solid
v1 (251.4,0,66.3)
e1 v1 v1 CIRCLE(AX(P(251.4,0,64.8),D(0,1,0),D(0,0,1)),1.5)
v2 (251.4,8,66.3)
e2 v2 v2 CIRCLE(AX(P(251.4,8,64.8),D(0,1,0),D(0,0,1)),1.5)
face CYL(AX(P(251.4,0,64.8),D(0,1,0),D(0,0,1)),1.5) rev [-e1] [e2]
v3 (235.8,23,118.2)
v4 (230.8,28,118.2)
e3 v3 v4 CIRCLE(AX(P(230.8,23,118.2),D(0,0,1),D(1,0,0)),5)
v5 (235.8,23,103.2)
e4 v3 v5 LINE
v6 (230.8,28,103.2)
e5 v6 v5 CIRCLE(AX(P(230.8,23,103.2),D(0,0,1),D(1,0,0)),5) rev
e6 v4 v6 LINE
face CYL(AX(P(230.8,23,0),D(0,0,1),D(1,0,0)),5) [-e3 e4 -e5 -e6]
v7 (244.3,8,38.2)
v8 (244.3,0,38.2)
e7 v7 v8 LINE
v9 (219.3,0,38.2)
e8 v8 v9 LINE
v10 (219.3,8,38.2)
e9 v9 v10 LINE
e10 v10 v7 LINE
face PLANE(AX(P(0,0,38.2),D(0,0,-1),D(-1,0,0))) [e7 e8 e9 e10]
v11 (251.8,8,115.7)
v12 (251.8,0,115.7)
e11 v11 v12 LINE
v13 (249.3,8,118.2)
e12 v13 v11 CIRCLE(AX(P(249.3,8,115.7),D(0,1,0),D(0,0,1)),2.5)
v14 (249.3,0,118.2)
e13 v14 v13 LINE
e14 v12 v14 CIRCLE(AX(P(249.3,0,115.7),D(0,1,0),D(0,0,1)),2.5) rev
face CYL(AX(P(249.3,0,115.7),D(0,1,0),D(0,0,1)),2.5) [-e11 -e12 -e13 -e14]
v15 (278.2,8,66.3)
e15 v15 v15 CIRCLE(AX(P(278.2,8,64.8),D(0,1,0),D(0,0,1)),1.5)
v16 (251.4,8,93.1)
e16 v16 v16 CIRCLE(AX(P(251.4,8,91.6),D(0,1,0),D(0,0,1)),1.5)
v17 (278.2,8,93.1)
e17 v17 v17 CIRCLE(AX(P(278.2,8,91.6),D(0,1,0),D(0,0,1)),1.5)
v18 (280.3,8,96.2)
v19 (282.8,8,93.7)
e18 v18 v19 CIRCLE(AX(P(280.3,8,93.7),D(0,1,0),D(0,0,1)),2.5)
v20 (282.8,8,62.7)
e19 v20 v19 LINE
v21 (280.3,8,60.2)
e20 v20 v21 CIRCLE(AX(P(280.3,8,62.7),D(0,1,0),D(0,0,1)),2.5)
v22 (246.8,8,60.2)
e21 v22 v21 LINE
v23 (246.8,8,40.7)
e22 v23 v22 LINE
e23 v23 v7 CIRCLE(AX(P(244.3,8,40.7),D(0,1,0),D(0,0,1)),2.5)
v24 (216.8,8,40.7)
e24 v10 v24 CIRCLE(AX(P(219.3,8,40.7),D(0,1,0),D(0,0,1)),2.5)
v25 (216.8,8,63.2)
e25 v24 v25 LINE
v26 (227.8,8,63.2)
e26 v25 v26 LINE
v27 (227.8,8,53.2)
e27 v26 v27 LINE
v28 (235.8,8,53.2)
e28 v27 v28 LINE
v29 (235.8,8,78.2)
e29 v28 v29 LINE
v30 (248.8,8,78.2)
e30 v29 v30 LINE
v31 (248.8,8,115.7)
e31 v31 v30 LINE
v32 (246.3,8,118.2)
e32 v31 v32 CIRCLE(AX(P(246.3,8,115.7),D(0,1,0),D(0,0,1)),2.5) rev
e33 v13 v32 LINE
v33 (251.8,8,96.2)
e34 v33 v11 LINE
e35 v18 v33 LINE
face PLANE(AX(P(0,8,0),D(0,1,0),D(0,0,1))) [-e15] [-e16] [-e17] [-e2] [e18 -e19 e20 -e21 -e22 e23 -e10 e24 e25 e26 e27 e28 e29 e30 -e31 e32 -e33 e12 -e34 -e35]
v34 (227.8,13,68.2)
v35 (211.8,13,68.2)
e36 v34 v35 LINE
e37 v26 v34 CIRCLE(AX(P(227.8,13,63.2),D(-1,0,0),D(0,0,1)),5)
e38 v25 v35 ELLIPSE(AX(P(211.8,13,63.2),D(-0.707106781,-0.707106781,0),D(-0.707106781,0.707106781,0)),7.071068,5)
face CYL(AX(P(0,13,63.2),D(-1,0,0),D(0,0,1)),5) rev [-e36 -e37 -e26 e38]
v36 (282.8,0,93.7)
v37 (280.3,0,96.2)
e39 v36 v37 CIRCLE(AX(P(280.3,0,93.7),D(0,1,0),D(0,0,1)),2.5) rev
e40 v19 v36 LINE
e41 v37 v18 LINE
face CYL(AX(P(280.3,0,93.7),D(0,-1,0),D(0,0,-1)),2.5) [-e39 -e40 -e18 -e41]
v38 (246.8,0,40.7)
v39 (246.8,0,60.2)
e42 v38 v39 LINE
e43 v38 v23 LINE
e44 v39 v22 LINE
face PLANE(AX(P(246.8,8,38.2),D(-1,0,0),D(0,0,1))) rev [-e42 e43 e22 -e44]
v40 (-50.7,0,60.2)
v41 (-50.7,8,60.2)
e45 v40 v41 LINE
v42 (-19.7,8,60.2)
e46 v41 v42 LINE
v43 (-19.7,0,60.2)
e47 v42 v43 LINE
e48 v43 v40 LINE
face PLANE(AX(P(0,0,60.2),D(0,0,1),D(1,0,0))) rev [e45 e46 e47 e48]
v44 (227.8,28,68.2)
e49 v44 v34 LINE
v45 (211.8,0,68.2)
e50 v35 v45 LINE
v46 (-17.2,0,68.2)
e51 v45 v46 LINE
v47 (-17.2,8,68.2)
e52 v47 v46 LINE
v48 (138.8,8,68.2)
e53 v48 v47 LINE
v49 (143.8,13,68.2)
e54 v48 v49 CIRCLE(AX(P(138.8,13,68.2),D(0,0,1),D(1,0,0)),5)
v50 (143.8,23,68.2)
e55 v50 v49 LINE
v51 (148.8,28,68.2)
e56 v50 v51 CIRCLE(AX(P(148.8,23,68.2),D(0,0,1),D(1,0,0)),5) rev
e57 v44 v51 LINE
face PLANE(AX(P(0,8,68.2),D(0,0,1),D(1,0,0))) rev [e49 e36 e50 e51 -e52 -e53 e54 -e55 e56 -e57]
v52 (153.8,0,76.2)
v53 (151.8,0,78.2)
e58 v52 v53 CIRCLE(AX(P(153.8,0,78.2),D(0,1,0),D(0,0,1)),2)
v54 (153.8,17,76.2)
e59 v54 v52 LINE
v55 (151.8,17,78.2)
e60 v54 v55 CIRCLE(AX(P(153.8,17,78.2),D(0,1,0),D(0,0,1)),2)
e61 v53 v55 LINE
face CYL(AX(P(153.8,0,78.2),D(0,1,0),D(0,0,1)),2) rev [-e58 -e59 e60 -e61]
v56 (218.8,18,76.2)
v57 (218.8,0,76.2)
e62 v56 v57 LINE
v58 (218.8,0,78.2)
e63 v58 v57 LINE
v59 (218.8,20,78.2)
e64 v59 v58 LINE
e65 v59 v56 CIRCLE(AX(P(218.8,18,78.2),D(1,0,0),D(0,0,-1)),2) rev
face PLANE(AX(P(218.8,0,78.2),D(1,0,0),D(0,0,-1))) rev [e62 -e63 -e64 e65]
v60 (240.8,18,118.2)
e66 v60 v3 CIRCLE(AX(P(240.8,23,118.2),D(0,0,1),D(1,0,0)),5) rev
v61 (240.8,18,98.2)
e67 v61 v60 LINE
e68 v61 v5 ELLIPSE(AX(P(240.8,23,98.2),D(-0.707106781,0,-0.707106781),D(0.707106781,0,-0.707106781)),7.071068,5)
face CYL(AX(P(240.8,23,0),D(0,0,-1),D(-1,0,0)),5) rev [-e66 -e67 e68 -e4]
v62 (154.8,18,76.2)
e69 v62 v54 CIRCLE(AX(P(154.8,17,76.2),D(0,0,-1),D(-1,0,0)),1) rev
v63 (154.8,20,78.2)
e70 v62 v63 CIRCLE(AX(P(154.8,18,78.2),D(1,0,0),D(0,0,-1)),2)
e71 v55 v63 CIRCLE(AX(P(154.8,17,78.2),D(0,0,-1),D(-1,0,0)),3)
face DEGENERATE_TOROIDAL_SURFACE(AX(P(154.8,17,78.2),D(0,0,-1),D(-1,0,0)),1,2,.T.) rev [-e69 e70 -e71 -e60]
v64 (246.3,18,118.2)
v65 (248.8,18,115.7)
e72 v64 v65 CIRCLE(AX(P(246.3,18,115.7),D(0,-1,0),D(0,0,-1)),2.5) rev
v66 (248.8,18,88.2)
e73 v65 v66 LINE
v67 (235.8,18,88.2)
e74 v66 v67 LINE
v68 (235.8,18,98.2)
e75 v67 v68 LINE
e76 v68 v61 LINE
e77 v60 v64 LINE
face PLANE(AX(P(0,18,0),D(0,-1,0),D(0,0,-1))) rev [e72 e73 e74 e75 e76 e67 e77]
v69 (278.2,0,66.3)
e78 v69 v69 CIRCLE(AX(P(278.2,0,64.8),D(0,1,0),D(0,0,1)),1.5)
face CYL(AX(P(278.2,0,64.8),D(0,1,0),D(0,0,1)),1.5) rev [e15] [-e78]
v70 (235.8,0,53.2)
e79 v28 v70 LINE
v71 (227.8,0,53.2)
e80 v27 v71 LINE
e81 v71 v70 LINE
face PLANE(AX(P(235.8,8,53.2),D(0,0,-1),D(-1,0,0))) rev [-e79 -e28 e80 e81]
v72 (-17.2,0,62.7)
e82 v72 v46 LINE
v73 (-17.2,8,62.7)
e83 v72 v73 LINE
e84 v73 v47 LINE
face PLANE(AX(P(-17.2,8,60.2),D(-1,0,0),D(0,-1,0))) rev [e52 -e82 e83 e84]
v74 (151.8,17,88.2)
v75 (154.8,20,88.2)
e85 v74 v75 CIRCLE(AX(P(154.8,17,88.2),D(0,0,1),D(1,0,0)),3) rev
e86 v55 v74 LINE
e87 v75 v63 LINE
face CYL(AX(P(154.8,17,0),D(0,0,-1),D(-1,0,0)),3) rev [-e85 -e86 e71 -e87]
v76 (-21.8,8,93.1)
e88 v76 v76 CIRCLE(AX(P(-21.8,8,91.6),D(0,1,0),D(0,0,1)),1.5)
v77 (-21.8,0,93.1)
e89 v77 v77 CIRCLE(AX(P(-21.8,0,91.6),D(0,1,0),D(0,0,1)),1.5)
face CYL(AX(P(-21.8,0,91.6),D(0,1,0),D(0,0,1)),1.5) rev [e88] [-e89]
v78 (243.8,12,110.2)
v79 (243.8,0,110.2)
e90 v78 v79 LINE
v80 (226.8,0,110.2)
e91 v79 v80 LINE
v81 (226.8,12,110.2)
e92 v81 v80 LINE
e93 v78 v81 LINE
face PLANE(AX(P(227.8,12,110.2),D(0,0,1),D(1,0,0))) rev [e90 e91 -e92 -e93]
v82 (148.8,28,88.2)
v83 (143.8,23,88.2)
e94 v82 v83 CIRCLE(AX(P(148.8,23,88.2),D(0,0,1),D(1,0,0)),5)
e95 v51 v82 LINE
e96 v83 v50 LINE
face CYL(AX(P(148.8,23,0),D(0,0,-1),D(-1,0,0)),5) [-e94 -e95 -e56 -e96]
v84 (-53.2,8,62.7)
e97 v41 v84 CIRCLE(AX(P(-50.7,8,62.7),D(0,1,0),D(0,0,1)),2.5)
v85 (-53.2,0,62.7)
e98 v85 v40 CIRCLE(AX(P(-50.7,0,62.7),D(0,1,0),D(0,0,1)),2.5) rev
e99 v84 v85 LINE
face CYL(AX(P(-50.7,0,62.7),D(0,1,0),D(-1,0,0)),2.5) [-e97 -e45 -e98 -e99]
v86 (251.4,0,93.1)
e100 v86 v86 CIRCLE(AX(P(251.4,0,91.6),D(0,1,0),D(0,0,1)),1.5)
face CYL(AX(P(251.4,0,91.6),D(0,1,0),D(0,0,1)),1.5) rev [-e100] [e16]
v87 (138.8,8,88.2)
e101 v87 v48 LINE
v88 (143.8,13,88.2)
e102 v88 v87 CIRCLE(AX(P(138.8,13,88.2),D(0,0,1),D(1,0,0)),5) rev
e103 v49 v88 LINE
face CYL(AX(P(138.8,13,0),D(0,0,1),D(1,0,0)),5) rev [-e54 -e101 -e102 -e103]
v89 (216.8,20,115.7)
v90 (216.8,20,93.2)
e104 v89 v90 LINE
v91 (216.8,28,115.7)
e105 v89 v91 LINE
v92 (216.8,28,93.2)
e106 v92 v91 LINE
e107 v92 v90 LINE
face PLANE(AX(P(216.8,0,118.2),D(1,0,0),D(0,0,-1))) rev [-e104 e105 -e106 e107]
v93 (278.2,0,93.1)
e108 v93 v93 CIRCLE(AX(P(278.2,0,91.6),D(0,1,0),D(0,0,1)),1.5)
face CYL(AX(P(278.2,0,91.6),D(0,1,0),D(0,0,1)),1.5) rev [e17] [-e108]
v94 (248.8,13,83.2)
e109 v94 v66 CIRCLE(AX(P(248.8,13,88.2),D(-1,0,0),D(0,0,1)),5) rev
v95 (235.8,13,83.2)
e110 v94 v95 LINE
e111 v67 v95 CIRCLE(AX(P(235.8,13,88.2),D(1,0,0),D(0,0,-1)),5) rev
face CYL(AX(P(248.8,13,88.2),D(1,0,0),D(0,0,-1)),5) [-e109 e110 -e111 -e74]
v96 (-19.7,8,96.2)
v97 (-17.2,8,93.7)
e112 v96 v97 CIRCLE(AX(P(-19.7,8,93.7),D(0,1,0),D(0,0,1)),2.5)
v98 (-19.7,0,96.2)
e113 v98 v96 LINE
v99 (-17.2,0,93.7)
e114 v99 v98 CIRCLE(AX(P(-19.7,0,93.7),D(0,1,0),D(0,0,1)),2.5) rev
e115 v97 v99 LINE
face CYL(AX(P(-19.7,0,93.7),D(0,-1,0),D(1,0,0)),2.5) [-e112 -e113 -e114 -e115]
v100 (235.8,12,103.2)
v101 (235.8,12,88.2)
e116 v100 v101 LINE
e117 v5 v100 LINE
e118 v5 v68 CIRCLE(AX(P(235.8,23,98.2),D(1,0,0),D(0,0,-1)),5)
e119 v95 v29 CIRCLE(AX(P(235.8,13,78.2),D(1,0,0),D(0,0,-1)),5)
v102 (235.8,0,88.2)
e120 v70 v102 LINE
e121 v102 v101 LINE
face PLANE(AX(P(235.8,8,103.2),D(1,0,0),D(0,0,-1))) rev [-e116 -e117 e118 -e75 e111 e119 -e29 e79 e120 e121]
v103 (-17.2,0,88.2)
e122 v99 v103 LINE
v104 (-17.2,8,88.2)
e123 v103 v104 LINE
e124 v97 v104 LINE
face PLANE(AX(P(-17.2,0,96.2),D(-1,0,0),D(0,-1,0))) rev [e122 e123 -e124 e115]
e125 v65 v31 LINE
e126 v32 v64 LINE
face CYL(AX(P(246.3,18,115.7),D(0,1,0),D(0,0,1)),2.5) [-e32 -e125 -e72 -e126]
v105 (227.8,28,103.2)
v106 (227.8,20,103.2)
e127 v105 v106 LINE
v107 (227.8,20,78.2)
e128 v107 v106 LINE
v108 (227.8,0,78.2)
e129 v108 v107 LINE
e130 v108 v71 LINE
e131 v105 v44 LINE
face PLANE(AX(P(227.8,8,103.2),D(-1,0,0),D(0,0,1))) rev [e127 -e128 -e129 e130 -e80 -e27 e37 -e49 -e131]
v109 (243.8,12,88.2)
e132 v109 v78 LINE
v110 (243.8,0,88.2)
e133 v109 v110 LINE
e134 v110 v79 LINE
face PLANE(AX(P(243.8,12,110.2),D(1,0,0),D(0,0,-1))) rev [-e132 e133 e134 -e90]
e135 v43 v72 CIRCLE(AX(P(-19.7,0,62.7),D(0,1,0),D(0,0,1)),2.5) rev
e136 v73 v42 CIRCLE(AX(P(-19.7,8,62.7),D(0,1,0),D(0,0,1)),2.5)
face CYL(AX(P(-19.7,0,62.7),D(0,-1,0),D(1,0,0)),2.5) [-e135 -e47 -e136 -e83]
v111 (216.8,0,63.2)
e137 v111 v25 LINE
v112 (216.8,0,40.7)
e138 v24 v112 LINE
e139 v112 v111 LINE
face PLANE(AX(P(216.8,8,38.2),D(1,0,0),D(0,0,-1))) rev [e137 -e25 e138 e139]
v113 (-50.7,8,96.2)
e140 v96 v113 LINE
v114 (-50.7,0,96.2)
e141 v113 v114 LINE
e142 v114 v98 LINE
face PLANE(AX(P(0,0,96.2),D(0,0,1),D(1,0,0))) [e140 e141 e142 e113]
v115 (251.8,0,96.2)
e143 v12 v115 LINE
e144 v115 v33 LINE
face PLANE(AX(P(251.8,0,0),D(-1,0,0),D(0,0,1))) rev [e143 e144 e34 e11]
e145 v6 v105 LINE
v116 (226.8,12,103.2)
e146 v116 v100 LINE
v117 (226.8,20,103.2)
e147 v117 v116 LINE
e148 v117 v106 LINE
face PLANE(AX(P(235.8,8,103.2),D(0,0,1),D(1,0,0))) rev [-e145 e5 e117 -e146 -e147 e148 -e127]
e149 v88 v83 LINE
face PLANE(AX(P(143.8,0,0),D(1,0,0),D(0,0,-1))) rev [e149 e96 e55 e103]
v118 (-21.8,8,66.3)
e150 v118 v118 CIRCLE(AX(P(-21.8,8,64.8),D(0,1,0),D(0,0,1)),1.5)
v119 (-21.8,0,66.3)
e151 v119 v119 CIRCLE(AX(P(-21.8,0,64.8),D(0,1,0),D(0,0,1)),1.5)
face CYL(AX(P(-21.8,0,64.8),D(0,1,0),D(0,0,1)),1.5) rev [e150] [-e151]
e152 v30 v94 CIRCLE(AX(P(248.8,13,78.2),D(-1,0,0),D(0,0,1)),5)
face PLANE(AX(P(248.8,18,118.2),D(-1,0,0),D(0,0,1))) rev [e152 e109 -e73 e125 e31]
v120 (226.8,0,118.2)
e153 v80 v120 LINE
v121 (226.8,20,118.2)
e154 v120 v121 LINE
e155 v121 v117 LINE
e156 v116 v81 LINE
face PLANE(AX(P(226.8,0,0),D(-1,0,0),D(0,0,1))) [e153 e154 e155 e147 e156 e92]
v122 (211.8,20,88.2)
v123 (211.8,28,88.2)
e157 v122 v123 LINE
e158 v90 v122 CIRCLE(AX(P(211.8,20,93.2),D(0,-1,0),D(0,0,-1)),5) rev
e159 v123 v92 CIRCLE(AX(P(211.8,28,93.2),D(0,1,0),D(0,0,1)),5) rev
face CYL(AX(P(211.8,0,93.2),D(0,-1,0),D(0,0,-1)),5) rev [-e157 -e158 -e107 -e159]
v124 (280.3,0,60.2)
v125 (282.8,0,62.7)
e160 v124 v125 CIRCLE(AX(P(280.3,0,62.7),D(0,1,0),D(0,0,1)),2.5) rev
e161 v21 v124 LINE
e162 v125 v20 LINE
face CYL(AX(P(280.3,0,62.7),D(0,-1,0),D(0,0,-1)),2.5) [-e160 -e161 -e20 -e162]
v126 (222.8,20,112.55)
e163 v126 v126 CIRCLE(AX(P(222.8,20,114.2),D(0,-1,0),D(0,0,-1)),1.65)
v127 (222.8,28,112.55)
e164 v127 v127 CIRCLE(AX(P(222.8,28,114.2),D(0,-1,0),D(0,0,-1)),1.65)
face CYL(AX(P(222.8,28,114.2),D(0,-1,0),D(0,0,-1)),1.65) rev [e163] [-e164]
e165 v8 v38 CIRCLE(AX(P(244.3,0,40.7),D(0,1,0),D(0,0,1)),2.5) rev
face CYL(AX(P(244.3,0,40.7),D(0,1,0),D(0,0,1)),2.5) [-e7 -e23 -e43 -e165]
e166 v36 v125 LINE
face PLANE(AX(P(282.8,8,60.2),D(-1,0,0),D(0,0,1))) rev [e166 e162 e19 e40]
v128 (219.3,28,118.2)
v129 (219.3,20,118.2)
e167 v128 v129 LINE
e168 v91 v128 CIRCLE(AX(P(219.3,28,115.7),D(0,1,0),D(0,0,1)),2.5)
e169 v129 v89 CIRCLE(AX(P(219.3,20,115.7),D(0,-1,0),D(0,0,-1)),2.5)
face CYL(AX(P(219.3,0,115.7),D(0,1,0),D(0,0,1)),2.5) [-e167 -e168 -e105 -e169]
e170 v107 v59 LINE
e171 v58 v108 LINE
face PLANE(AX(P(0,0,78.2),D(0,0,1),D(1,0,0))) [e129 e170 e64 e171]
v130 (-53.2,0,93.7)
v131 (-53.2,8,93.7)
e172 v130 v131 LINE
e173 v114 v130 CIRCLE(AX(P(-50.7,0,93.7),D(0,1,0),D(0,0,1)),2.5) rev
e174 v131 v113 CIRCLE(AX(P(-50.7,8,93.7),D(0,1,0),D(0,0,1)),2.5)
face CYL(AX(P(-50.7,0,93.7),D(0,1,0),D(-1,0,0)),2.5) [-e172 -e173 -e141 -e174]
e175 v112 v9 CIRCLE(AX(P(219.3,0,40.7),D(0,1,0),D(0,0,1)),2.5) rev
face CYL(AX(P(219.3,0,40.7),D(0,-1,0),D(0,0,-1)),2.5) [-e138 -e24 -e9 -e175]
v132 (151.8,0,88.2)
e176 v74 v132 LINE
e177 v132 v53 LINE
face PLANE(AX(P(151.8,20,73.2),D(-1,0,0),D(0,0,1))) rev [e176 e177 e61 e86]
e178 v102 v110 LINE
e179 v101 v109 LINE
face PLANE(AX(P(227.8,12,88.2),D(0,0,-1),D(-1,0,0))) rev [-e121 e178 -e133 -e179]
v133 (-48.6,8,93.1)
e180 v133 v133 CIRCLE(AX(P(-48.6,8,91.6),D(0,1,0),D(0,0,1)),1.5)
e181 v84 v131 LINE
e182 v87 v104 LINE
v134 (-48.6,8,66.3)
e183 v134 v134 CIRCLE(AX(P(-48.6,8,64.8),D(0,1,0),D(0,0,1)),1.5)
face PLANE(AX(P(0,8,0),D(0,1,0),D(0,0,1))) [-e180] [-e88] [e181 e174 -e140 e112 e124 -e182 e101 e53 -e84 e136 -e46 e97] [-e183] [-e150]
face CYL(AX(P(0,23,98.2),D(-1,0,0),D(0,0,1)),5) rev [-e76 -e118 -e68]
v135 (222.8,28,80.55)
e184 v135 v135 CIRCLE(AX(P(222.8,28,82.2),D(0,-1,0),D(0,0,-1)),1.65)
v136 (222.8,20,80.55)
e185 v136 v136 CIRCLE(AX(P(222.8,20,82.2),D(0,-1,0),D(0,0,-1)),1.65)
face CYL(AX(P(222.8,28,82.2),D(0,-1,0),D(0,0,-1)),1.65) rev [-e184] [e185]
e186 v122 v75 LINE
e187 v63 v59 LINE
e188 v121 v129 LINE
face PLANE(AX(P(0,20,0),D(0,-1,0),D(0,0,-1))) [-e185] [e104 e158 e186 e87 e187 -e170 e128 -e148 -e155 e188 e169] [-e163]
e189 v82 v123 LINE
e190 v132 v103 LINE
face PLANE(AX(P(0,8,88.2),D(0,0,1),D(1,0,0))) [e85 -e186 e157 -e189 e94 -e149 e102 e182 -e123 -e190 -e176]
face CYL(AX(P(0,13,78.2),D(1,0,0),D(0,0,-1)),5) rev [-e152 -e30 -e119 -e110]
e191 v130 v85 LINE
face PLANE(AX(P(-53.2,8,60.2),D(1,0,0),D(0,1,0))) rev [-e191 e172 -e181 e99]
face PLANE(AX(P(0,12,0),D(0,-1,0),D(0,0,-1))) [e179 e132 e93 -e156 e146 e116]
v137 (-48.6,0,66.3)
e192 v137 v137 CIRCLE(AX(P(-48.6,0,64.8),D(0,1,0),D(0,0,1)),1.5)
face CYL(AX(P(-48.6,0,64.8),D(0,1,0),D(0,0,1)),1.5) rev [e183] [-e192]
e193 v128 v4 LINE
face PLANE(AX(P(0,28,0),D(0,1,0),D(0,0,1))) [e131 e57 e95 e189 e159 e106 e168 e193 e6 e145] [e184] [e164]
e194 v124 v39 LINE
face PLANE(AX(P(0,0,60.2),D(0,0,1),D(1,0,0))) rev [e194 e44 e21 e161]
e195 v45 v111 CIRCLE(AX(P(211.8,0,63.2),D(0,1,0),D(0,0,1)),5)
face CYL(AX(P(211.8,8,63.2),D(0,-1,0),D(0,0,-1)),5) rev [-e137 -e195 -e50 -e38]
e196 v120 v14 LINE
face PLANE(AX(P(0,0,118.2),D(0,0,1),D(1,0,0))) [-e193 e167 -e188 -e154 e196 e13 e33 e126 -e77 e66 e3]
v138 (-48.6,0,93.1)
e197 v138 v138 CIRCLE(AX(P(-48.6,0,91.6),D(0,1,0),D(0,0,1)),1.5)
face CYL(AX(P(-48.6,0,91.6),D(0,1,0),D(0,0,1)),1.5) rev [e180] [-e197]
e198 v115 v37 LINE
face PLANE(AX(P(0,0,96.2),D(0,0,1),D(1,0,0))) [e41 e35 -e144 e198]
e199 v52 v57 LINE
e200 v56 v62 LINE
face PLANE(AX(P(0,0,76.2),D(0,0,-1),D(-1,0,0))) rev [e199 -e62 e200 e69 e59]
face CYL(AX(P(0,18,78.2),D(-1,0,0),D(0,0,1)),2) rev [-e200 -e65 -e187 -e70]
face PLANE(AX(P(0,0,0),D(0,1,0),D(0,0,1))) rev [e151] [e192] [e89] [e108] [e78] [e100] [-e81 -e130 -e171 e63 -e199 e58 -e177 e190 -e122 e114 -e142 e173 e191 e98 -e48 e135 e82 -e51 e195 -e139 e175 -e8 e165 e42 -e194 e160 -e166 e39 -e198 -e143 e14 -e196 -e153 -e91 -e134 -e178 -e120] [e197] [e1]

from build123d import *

# Parameters (mm, degrees)
SKETCH1_W            = 70
SKETCH1_H            = 20
SKETCH1_W_2          = 264.8
EXTRUDE_1017_DEPTH   = 8
SKETCH2_W            = 36
SKETCH2_H            = 8
BOSS_EXTRUDE2_DEPTH  = 8
SKETCH4_W            = 36
SKETCH4_H            = 8
BOSS_EXTRUDE3_DEPTH  = 8
SKETCH5_R            = 1.5
CUT_EXTRUDE1_DEPTH   = 349.438631613
FILLET1_R            = 2.5
SKETCH6_W            = 52
SKETCH6_H            = 20
CUT_EXTRUDE2_DEPTH   = 349.438631613
SKETCH7_W            = 16.8
SKETCH7_H            = 20
CUT_EXTRUDE3_DEPTH   = 299.821485171
SKETCH8_W            = 30
SKETCH8_H            = 8
BOSS_EXTRUDE4_DEPTH  = 30
SKETCH9_W            = 30
SKETCH9_H            = 8
BOSS_EXTRUDE5_DEPTH  = 30
SKETCH10_W           = 8
SKETCH10_H           = 50
CUT_EXTRUDE4_DEPTH   = 307.61226329
SKETCH12_W           = 11
SKETCH12_H           = 50
BOSS_EXTRUDE6_DEPTH  = 17
SKETCH13_W           = 8
SKETCH13_H           = 15
BOSS_EXTRUDE7_DEPTH  = 17
SKETCH15_W           = 11
SKETCH15_H           = 45
CUT_EXTRUDE6_DEPTH   = 20
SKETCH16_W           = 22
SKETCH16_H           = 8
BOSS_EXTRUDE9_DEPTH  = 5
SKETCH18_W           = 13
SKETCH18_H           = 40
BOSS_EXTRUDE10_DEPTH = 10
SKETCH21_W           = 13
SKETCH21_H           = 5
CUT_EXTRUDE9_DEPTH   = 10
SKETCH17_W           = 16
SKETCH17_H           = 22
CUT_EXTRUDE7_DEPTH   = 12
SKETCH19_W           = 70
SKETCH19_H           = 20
BOSS_EXTRUDE11_DEPTH = 17
SKETCH20_W           = 65
SKETCH20_H           = 15
CUT_EXTRUDE8_DEPTH   = 20
SKETCH22_W           = 20
SKETCH22_H           = 17
BOSS_EXTRUDE12_DEPTH = 3
BOSS_EXTRUDE13_DEPTH = 3
SKETCH24_R           = 1.65
CUT_EXTRUDE10_DEPTH  = 308.159697877
BOSS_EXTRUDE14_DEPTH = 1
FILLET4_R            = 5
FILLET5_R            = 5
FILLET7_R            = 5
FILLET8_R            = 5
FILLET9_R            = 5
FILLET10_R           = 5
FILLET11_R           = 5
FILLET12_R           = 5
FILLET13_R           = 5
FILLET14_R           = 2.5
FILLET15_R           = 2.5
FILLET16_R           = 2.5
FILLET17_R           = 5
SKETCH26_W           = 76
SKETCH26_H           = 20
BOSS_EXTRUDE15_DEPTH = 3
FILLET18_R           = 3
SKETCH27_W           = 9
SKETCH27_H           = 20
BOSS_EXTRUDE16_DEPTH = 2
FILLET20_R           = 2


with BuildPart() as part:
    # Sketch1 → Extrude 1017 (new body)
    with BuildSketch(Plane(origin=(0, 0, 0), x_dir=(1, 0, 0), z_dir=(0, 1, 0))):
        with Locations((-35, -78.2)):
            Rectangle(SKETCH1_W, SKETCH1_H)
        with Locations((132.4, -78.2)):
            Rectangle(SKETCH1_W_2, SKETCH1_H)
        with Locations((299.8, -78.2)):
            Rectangle(SKETCH1_W, SKETCH1_H)
    extrude(amount=EXTRUDE_1017_DEPTH)

    # Sketch2 → Boss-Extrude2 (add)
    with BuildSketch(Plane(origin=(0, 0, 68.2), x_dir=(-1, 0, 0), z_dir=(0, 0, -1))):
        with Locations((35.2, 4)):
            Rectangle(SKETCH2_W, SKETCH2_H)
        with Locations((-264.8, 4)):
            Rectangle(SKETCH2_W, SKETCH2_H)
    extrude(amount=BOSS_EXTRUDE2_DEPTH)

    # Sketch4 → Boss-Extrude3 (add)
    with BuildSketch(Plane.XY.offset(88.2)):
        with Locations((-35.2, 4)):
            Rectangle(SKETCH4_W, SKETCH4_H)
        with Locations((264.8, 4)):
            Rectangle(SKETCH4_W, SKETCH4_H)
    extrude(amount=BOSS_EXTRUDE3_DEPTH)

    # Sketch5 → Cut-Extrude1 (cut, through all)
    with BuildSketch(Plane(origin=(0, 8, 0), x_dir=(1, 0, 0), z_dir=(0, 1, 0))):
        with Locations(Location((-48.6, -91.6, 0), (0, 0, 270))):
            Circle(SKETCH5_R)
        with Locations(Location((-21.8, -91.6, 0), (0, 0, 270))):
            Circle(SKETCH5_R)
        with Locations(Location((-21.8, -64.8, 0), (0, 0, 270))):
            Circle(SKETCH5_R)
        with Locations(Location((-48.6, -64.8, 0), (0, 0, 270))):
            Circle(SKETCH5_R)
        with Locations(Location((278.2, -91.6, 0), (0, 0, 270))):
            Circle(SKETCH5_R)
        with Locations(Location((251.4, -64.8, 0), (0, 0, 270))):
            Circle(SKETCH5_R)
        with Locations(Location((278.2, -64.8, 0), (0, 0, 270))):
            Circle(SKETCH5_R)
        with Locations(Location((251.4, -91.6, 0), (0, 0, 270))):
            Circle(SKETCH5_R)
    extrude(amount=-CUT_EXTRUDE1_DEPTH, mode=Mode.SUBTRACT)

    # Fillet1
    fillet1_edges = [part.edges().sort_by_distance(p)[0] for p in [
        (-53.2, 4, 60.2),
        (-17.2, 4, 60.2),
        (282.8, 4, 60.2),
        (-17.2, 4, 96.2),
        (-53.2, 4, 96.2),
        (282.8, 4, 96.2),
    ]]
    fillet(fillet1_edges, radius=FILLET1_R)

    # Sketch6 → Cut-Extrude2 (cut, through all)
    with BuildSketch(Plane(origin=(0, 8, 0), x_dir=(1, 0, 0), z_dir=(0, 1, 0))):
        with Locations((308.8, -78.2)):
            Rectangle(SKETCH6_W, SKETCH6_H)
    extrude(amount=-CUT_EXTRUDE2_DEPTH, mode=Mode.SUBTRACT)

    # Sketch7 → Cut-Extrude3 (cut, through all)
    with BuildSketch(Plane(origin=(0, 0, 0), x_dir=(-1, 0, 0), z_dir=(0, -1, 0))):
        with Locations((61.6, -78.2)):
            Rectangle(SKETCH7_W, SKETCH7_H)
    extrude(amount=-CUT_EXTRUDE3_DEPTH, mode=Mode.SUBTRACT)

    # Sketch8 → Boss-Extrude4 (add)
    with BuildSketch(Plane.XY.offset(88.2)):
        with Locations((231.8, 4)):
            Rectangle(SKETCH8_W, SKETCH8_H)
    extrude(amount=BOSS_EXTRUDE4_DEPTH)

    # Sketch9 → Boss-Extrude5 (add)
    with BuildSketch(Plane(origin=(0, 0, 68.2), x_dir=(-1, 0, 0), z_dir=(0, 0, -1))):
        with Locations((-231.8, 4)):
            Rectangle(SKETCH9_W, SKETCH9_H)
    extrude(amount=BOSS_EXTRUDE5_DEPTH)

    # Sketch10 → Cut-Extrude4 (cut, through all)
    with BuildSketch(Plane(origin=(0, 0, 0), x_dir=(-1, 0, 0), z_dir=(0, -1, 0))):
        with Locations((-231.8, -78.2)):
            Rectangle(SKETCH10_W, SKETCH10_H)
    extrude(amount=-CUT_EXTRUDE4_DEPTH, mode=Mode.SUBTRACT)

    # Sketch12 → Boss-Extrude6 (add)
    with BuildSketch(Plane(origin=(0, 8, 0), x_dir=(1, 0, 0), z_dir=(0, 1, 0))):
        with Locations((222.3, -93.2)):
            Rectangle(SKETCH12_W, SKETCH12_H)
    extrude(amount=BOSS_EXTRUDE6_DEPTH)

    # Sketch13 → Boss-Extrude7 (add)
    with BuildSketch(Plane(origin=(0, 8, 0), x_dir=(1, 0, 0), z_dir=(0, 1, 0))):
        with Locations((231.8, -110.7)):
            Rectangle(SKETCH13_W, SKETCH13_H)
    extrude(amount=BOSS_EXTRUDE7_DEPTH)

    # Sketch15 → Cut-Extrude6 (cut)
    with BuildSketch(Plane(origin=(0, 0, 0), x_dir=(-1, 0, 0), z_dir=(0, -1, 0))):
        with Locations((-222.3, -95.7)):
            Rectangle(SKETCH15_W, SKETCH15_H)
    extrude(amount=-CUT_EXTRUDE6_DEPTH, mode=Mode.SUBTRACT)

    # Sketch16 → Boss-Extrude9 (add)
    with BuildSketch(Plane(origin=(246.8, 0, 0), x_dir=(0, 0, -1), z_dir=(1, 0, 0))):
        with Locations((-107.2, 4)):
            Rectangle(SKETCH16_W, SKETCH16_H)
    extrude(amount=BOSS_EXTRUDE9_DEPTH)

    # Sketch18 → Boss-Extrude10 (add)
    with BuildSketch(Plane(origin=(0, 8, 0), x_dir=(1, 0, 0), z_dir=(0, 1, 0))):
        with Locations((242.3, -98.2)):
            Rectangle(SKETCH18_W, SKETCH18_H)
    extrude(amount=BOSS_EXTRUDE10_DEPTH)

    # Sketch21 → Cut-Extrude9 (cut)
    with BuildSketch(Plane(origin=(0, 18, 0), x_dir=(1, 0, 0), z_dir=(0, 1, 0))):
        with Locations((242.3, -80.7)):
            Rectangle(SKETCH21_W, SKETCH21_H)
    extrude(amount=-CUT_EXTRUDE9_DEPTH, mode=Mode.SUBTRACT)

    # Sketch17 → Cut-Extrude7 (cut)
    with BuildSketch(Plane(origin=(0, 0, 0), x_dir=(-1, 0, 0), z_dir=(0, -1, 0))):
        with Locations((-235.8, -99.2)):
            Rectangle(SKETCH17_W, SKETCH17_H)
    extrude(amount=-CUT_EXTRUDE7_DEPTH, mode=Mode.SUBTRACT)

    # Sketch19 → Boss-Extrude11 (add)
    with BuildSketch(Plane(origin=(0, 8, 0), x_dir=(1, 0, 0), z_dir=(0, 1, 0))):
        with Locations((181.8, -78.2)):
            Rectangle(SKETCH19_W, SKETCH19_H)
    extrude(amount=BOSS_EXTRUDE11_DEPTH)

    # Sketch20 → Cut-Extrude8 (cut)
    with BuildSketch(Plane(origin=(0, 0, 0), x_dir=(-1, 0, 0), z_dir=(0, -1, 0))):
        with Locations((-184.3, -80.7)):
            Rectangle(SKETCH20_W, SKETCH20_H)
    extrude(amount=-CUT_EXTRUDE8_DEPTH, mode=Mode.SUBTRACT)

    # Sketch22 → Boss-Extrude12 (add)
    with BuildSketch(Plane.ZY.offset(-146.8)):
        with Locations((78.2, 16.5)):
            Rectangle(SKETCH22_W, SKETCH22_H)
    extrude(amount=BOSS_EXTRUDE12_DEPTH)

    # Sketch23 → Boss-Extrude13 (add)
    with BuildSketch(Plane(origin=(0, 25, 0), x_dir=(1, 0, 0), z_dir=(0, 1, 0))):
        Polygon((143.8, -68.2), (143.8, -88.2), (216.8, -88.2), (216.8, -118.2), (235.8, -118.2), (235.8, -103.2), (227.8, -103.2), (227.8, -68.2), align=None)
    extrude(amount=BOSS_EXTRUDE13_DEPTH)

    # Sketch24 → Cut-Extrude10 (cut, through all)
    with BuildSketch(Plane(origin=(0, 20, 0), x_dir=(-1, 0, 0), z_dir=(0, -1, 0))):
        with Locations(Location((-222.8, -114.2, 0), (0, 0, 90))):
            Circle(SKETCH24_R)
        with Locations(Location((-222.8, -82.2, 0), (0, 0, 90))):
            Circle(SKETCH24_R)
    extrude(amount=-CUT_EXTRUDE10_DEPTH, mode=Mode.SUBTRACT)

    # Sketch25 → Boss-Extrude14 (add)
    with BuildSketch(Plane.ZY.offset(-227.8)):
        Polygon((103.2, 20), (103.2, 12), (110.2, 12), (110.2, 0), (118.2, 0), (118.2, 20), align=None)
    extrude(amount=BOSS_EXTRUDE14_DEPTH)

    # Fillet4
    fillet4_edges = [part.edges().sort_by_distance(p)[0] for p in [
        (143.8, 8, 78.2),
    ]]
    fillet(fillet4_edges, radius=FILLET4_R)

    # Fillet5
    fillet5_edges = [part.edges().sort_by_distance(p)[0] for p in [
        (143.8, 28, 78.2),
    ]]
    fillet(fillet5_edges, radius=FILLET5_R)

    # Fillet7
    fillet7_edges = [part.edges().sort_by_distance(p)[0] for p in [
        (222.3, 8, 68.2),
    ]]
    fillet(fillet7_edges, radius=FILLET7_R)

    # Fillet8
    fillet8_edges = [part.edges().sort_by_distance(p)[0] for p in [
        (235.8, 18, 110.7),
    ]]
    fillet(fillet8_edges, radius=FILLET8_R)

    # Fillet9
    fillet9_edges = [part.edges().sort_by_distance(p)[0] for p in [
        (235.8, 28, 110.7),
    ]]
    fillet(fillet9_edges, radius=FILLET9_R - 0.0001)  # a hair under: the kernel refuses the full size

    # Fillet10
    fillet10_edges = [part.edges().sort_by_distance(p)[0] for p in [
        (216.8, 6.5, 68.2),
    ]]
    fillet(fillet10_edges, radius=FILLET10_R)

    # Fillet11
    fillet11_edges = [part.edges().sort_by_distance(p)[0] for p in [
        (242.3, 8, 83.2),
    ]]
    fillet(fillet11_edges, radius=FILLET11_R)

    # Fillet12
    fillet12_edges = [part.edges().sort_by_distance(p)[0] for p in [
        (242.3, 18, 83.2),
    ]]
    fillet(fillet12_edges, radius=FILLET12_R - 0.0001)  # a hair under: the kernel refuses the full size

    # Fillet13
    fillet13_edges = [part.edges().sort_by_distance(p)[0] for p in [
        (216.8, 24, 88.2),
    ]]
    fillet(fillet13_edges, radius=FILLET13_R)

    # Fillet14
    fillet14_edges = [part.edges().sort_by_distance(p)[0] for p in [
        (246.8, 4, 38.2),
        (216.8, 4, 38.2),
    ]]
    fillet(fillet14_edges, radius=FILLET14_R)

    # Fillet15
    fillet15_edges = [part.edges().sort_by_distance(p)[0] for p in [
        (216.8, 24, 118.2),
        (251.8, 4, 118.2),
    ]]
    fillet(fillet15_edges, radius=FILLET15_R)

    # Fillet16
    fillet16_edges = [part.edges().sort_by_distance(p)[0] for p in [
        (248.8, 13, 118.2),
    ]]
    fillet(fillet16_edges, radius=FILLET16_R)

    # Fillet17
    fillet17_edges = [part.edges().sort_by_distance(p)[0] for p in [
        (238.3, 18, 103.2),
    ]]
    fillet(fillet17_edges, radius=FILLET17_R - 0.0001)  # a hair under: the kernel refuses the full size

    # Sketch26 → Boss-Extrude15 (add)
    with BuildSketch(Plane.XY.offset(73.2)):
        with Locations((189.8, 10)):
            Rectangle(SKETCH26_W, SKETCH26_H)
    extrude(amount=BOSS_EXTRUDE15_DEPTH)

    # Fillet18
    fillet18_edges = [part.edges().sort_by_distance(p)[0] for p in [
        (151.8, 20, 82.2),
    ]]
    fillet(fillet18_edges, radius=FILLET18_R)

    # Sketch27 → Boss-Extrude16 (add)
    with BuildSketch(Plane.XY.offset(76.2)):
        with Locations((223.3, 10)):
            Rectangle(SKETCH27_W, SKETCH27_H)
    extrude(amount=BOSS_EXTRUDE16_DEPTH)

    # Fillet20
    fillet20_edges = [part.edges().sort_by_distance(p)[0] for p in [
        (151.8, 8.5, 76.2),
        (152.678679656, 19.121320344, 76.2),
        (186.8, 20, 76.2),
    ]]
    fillet(fillet20_edges, radius=FILLET20_R)


solid = part.part
